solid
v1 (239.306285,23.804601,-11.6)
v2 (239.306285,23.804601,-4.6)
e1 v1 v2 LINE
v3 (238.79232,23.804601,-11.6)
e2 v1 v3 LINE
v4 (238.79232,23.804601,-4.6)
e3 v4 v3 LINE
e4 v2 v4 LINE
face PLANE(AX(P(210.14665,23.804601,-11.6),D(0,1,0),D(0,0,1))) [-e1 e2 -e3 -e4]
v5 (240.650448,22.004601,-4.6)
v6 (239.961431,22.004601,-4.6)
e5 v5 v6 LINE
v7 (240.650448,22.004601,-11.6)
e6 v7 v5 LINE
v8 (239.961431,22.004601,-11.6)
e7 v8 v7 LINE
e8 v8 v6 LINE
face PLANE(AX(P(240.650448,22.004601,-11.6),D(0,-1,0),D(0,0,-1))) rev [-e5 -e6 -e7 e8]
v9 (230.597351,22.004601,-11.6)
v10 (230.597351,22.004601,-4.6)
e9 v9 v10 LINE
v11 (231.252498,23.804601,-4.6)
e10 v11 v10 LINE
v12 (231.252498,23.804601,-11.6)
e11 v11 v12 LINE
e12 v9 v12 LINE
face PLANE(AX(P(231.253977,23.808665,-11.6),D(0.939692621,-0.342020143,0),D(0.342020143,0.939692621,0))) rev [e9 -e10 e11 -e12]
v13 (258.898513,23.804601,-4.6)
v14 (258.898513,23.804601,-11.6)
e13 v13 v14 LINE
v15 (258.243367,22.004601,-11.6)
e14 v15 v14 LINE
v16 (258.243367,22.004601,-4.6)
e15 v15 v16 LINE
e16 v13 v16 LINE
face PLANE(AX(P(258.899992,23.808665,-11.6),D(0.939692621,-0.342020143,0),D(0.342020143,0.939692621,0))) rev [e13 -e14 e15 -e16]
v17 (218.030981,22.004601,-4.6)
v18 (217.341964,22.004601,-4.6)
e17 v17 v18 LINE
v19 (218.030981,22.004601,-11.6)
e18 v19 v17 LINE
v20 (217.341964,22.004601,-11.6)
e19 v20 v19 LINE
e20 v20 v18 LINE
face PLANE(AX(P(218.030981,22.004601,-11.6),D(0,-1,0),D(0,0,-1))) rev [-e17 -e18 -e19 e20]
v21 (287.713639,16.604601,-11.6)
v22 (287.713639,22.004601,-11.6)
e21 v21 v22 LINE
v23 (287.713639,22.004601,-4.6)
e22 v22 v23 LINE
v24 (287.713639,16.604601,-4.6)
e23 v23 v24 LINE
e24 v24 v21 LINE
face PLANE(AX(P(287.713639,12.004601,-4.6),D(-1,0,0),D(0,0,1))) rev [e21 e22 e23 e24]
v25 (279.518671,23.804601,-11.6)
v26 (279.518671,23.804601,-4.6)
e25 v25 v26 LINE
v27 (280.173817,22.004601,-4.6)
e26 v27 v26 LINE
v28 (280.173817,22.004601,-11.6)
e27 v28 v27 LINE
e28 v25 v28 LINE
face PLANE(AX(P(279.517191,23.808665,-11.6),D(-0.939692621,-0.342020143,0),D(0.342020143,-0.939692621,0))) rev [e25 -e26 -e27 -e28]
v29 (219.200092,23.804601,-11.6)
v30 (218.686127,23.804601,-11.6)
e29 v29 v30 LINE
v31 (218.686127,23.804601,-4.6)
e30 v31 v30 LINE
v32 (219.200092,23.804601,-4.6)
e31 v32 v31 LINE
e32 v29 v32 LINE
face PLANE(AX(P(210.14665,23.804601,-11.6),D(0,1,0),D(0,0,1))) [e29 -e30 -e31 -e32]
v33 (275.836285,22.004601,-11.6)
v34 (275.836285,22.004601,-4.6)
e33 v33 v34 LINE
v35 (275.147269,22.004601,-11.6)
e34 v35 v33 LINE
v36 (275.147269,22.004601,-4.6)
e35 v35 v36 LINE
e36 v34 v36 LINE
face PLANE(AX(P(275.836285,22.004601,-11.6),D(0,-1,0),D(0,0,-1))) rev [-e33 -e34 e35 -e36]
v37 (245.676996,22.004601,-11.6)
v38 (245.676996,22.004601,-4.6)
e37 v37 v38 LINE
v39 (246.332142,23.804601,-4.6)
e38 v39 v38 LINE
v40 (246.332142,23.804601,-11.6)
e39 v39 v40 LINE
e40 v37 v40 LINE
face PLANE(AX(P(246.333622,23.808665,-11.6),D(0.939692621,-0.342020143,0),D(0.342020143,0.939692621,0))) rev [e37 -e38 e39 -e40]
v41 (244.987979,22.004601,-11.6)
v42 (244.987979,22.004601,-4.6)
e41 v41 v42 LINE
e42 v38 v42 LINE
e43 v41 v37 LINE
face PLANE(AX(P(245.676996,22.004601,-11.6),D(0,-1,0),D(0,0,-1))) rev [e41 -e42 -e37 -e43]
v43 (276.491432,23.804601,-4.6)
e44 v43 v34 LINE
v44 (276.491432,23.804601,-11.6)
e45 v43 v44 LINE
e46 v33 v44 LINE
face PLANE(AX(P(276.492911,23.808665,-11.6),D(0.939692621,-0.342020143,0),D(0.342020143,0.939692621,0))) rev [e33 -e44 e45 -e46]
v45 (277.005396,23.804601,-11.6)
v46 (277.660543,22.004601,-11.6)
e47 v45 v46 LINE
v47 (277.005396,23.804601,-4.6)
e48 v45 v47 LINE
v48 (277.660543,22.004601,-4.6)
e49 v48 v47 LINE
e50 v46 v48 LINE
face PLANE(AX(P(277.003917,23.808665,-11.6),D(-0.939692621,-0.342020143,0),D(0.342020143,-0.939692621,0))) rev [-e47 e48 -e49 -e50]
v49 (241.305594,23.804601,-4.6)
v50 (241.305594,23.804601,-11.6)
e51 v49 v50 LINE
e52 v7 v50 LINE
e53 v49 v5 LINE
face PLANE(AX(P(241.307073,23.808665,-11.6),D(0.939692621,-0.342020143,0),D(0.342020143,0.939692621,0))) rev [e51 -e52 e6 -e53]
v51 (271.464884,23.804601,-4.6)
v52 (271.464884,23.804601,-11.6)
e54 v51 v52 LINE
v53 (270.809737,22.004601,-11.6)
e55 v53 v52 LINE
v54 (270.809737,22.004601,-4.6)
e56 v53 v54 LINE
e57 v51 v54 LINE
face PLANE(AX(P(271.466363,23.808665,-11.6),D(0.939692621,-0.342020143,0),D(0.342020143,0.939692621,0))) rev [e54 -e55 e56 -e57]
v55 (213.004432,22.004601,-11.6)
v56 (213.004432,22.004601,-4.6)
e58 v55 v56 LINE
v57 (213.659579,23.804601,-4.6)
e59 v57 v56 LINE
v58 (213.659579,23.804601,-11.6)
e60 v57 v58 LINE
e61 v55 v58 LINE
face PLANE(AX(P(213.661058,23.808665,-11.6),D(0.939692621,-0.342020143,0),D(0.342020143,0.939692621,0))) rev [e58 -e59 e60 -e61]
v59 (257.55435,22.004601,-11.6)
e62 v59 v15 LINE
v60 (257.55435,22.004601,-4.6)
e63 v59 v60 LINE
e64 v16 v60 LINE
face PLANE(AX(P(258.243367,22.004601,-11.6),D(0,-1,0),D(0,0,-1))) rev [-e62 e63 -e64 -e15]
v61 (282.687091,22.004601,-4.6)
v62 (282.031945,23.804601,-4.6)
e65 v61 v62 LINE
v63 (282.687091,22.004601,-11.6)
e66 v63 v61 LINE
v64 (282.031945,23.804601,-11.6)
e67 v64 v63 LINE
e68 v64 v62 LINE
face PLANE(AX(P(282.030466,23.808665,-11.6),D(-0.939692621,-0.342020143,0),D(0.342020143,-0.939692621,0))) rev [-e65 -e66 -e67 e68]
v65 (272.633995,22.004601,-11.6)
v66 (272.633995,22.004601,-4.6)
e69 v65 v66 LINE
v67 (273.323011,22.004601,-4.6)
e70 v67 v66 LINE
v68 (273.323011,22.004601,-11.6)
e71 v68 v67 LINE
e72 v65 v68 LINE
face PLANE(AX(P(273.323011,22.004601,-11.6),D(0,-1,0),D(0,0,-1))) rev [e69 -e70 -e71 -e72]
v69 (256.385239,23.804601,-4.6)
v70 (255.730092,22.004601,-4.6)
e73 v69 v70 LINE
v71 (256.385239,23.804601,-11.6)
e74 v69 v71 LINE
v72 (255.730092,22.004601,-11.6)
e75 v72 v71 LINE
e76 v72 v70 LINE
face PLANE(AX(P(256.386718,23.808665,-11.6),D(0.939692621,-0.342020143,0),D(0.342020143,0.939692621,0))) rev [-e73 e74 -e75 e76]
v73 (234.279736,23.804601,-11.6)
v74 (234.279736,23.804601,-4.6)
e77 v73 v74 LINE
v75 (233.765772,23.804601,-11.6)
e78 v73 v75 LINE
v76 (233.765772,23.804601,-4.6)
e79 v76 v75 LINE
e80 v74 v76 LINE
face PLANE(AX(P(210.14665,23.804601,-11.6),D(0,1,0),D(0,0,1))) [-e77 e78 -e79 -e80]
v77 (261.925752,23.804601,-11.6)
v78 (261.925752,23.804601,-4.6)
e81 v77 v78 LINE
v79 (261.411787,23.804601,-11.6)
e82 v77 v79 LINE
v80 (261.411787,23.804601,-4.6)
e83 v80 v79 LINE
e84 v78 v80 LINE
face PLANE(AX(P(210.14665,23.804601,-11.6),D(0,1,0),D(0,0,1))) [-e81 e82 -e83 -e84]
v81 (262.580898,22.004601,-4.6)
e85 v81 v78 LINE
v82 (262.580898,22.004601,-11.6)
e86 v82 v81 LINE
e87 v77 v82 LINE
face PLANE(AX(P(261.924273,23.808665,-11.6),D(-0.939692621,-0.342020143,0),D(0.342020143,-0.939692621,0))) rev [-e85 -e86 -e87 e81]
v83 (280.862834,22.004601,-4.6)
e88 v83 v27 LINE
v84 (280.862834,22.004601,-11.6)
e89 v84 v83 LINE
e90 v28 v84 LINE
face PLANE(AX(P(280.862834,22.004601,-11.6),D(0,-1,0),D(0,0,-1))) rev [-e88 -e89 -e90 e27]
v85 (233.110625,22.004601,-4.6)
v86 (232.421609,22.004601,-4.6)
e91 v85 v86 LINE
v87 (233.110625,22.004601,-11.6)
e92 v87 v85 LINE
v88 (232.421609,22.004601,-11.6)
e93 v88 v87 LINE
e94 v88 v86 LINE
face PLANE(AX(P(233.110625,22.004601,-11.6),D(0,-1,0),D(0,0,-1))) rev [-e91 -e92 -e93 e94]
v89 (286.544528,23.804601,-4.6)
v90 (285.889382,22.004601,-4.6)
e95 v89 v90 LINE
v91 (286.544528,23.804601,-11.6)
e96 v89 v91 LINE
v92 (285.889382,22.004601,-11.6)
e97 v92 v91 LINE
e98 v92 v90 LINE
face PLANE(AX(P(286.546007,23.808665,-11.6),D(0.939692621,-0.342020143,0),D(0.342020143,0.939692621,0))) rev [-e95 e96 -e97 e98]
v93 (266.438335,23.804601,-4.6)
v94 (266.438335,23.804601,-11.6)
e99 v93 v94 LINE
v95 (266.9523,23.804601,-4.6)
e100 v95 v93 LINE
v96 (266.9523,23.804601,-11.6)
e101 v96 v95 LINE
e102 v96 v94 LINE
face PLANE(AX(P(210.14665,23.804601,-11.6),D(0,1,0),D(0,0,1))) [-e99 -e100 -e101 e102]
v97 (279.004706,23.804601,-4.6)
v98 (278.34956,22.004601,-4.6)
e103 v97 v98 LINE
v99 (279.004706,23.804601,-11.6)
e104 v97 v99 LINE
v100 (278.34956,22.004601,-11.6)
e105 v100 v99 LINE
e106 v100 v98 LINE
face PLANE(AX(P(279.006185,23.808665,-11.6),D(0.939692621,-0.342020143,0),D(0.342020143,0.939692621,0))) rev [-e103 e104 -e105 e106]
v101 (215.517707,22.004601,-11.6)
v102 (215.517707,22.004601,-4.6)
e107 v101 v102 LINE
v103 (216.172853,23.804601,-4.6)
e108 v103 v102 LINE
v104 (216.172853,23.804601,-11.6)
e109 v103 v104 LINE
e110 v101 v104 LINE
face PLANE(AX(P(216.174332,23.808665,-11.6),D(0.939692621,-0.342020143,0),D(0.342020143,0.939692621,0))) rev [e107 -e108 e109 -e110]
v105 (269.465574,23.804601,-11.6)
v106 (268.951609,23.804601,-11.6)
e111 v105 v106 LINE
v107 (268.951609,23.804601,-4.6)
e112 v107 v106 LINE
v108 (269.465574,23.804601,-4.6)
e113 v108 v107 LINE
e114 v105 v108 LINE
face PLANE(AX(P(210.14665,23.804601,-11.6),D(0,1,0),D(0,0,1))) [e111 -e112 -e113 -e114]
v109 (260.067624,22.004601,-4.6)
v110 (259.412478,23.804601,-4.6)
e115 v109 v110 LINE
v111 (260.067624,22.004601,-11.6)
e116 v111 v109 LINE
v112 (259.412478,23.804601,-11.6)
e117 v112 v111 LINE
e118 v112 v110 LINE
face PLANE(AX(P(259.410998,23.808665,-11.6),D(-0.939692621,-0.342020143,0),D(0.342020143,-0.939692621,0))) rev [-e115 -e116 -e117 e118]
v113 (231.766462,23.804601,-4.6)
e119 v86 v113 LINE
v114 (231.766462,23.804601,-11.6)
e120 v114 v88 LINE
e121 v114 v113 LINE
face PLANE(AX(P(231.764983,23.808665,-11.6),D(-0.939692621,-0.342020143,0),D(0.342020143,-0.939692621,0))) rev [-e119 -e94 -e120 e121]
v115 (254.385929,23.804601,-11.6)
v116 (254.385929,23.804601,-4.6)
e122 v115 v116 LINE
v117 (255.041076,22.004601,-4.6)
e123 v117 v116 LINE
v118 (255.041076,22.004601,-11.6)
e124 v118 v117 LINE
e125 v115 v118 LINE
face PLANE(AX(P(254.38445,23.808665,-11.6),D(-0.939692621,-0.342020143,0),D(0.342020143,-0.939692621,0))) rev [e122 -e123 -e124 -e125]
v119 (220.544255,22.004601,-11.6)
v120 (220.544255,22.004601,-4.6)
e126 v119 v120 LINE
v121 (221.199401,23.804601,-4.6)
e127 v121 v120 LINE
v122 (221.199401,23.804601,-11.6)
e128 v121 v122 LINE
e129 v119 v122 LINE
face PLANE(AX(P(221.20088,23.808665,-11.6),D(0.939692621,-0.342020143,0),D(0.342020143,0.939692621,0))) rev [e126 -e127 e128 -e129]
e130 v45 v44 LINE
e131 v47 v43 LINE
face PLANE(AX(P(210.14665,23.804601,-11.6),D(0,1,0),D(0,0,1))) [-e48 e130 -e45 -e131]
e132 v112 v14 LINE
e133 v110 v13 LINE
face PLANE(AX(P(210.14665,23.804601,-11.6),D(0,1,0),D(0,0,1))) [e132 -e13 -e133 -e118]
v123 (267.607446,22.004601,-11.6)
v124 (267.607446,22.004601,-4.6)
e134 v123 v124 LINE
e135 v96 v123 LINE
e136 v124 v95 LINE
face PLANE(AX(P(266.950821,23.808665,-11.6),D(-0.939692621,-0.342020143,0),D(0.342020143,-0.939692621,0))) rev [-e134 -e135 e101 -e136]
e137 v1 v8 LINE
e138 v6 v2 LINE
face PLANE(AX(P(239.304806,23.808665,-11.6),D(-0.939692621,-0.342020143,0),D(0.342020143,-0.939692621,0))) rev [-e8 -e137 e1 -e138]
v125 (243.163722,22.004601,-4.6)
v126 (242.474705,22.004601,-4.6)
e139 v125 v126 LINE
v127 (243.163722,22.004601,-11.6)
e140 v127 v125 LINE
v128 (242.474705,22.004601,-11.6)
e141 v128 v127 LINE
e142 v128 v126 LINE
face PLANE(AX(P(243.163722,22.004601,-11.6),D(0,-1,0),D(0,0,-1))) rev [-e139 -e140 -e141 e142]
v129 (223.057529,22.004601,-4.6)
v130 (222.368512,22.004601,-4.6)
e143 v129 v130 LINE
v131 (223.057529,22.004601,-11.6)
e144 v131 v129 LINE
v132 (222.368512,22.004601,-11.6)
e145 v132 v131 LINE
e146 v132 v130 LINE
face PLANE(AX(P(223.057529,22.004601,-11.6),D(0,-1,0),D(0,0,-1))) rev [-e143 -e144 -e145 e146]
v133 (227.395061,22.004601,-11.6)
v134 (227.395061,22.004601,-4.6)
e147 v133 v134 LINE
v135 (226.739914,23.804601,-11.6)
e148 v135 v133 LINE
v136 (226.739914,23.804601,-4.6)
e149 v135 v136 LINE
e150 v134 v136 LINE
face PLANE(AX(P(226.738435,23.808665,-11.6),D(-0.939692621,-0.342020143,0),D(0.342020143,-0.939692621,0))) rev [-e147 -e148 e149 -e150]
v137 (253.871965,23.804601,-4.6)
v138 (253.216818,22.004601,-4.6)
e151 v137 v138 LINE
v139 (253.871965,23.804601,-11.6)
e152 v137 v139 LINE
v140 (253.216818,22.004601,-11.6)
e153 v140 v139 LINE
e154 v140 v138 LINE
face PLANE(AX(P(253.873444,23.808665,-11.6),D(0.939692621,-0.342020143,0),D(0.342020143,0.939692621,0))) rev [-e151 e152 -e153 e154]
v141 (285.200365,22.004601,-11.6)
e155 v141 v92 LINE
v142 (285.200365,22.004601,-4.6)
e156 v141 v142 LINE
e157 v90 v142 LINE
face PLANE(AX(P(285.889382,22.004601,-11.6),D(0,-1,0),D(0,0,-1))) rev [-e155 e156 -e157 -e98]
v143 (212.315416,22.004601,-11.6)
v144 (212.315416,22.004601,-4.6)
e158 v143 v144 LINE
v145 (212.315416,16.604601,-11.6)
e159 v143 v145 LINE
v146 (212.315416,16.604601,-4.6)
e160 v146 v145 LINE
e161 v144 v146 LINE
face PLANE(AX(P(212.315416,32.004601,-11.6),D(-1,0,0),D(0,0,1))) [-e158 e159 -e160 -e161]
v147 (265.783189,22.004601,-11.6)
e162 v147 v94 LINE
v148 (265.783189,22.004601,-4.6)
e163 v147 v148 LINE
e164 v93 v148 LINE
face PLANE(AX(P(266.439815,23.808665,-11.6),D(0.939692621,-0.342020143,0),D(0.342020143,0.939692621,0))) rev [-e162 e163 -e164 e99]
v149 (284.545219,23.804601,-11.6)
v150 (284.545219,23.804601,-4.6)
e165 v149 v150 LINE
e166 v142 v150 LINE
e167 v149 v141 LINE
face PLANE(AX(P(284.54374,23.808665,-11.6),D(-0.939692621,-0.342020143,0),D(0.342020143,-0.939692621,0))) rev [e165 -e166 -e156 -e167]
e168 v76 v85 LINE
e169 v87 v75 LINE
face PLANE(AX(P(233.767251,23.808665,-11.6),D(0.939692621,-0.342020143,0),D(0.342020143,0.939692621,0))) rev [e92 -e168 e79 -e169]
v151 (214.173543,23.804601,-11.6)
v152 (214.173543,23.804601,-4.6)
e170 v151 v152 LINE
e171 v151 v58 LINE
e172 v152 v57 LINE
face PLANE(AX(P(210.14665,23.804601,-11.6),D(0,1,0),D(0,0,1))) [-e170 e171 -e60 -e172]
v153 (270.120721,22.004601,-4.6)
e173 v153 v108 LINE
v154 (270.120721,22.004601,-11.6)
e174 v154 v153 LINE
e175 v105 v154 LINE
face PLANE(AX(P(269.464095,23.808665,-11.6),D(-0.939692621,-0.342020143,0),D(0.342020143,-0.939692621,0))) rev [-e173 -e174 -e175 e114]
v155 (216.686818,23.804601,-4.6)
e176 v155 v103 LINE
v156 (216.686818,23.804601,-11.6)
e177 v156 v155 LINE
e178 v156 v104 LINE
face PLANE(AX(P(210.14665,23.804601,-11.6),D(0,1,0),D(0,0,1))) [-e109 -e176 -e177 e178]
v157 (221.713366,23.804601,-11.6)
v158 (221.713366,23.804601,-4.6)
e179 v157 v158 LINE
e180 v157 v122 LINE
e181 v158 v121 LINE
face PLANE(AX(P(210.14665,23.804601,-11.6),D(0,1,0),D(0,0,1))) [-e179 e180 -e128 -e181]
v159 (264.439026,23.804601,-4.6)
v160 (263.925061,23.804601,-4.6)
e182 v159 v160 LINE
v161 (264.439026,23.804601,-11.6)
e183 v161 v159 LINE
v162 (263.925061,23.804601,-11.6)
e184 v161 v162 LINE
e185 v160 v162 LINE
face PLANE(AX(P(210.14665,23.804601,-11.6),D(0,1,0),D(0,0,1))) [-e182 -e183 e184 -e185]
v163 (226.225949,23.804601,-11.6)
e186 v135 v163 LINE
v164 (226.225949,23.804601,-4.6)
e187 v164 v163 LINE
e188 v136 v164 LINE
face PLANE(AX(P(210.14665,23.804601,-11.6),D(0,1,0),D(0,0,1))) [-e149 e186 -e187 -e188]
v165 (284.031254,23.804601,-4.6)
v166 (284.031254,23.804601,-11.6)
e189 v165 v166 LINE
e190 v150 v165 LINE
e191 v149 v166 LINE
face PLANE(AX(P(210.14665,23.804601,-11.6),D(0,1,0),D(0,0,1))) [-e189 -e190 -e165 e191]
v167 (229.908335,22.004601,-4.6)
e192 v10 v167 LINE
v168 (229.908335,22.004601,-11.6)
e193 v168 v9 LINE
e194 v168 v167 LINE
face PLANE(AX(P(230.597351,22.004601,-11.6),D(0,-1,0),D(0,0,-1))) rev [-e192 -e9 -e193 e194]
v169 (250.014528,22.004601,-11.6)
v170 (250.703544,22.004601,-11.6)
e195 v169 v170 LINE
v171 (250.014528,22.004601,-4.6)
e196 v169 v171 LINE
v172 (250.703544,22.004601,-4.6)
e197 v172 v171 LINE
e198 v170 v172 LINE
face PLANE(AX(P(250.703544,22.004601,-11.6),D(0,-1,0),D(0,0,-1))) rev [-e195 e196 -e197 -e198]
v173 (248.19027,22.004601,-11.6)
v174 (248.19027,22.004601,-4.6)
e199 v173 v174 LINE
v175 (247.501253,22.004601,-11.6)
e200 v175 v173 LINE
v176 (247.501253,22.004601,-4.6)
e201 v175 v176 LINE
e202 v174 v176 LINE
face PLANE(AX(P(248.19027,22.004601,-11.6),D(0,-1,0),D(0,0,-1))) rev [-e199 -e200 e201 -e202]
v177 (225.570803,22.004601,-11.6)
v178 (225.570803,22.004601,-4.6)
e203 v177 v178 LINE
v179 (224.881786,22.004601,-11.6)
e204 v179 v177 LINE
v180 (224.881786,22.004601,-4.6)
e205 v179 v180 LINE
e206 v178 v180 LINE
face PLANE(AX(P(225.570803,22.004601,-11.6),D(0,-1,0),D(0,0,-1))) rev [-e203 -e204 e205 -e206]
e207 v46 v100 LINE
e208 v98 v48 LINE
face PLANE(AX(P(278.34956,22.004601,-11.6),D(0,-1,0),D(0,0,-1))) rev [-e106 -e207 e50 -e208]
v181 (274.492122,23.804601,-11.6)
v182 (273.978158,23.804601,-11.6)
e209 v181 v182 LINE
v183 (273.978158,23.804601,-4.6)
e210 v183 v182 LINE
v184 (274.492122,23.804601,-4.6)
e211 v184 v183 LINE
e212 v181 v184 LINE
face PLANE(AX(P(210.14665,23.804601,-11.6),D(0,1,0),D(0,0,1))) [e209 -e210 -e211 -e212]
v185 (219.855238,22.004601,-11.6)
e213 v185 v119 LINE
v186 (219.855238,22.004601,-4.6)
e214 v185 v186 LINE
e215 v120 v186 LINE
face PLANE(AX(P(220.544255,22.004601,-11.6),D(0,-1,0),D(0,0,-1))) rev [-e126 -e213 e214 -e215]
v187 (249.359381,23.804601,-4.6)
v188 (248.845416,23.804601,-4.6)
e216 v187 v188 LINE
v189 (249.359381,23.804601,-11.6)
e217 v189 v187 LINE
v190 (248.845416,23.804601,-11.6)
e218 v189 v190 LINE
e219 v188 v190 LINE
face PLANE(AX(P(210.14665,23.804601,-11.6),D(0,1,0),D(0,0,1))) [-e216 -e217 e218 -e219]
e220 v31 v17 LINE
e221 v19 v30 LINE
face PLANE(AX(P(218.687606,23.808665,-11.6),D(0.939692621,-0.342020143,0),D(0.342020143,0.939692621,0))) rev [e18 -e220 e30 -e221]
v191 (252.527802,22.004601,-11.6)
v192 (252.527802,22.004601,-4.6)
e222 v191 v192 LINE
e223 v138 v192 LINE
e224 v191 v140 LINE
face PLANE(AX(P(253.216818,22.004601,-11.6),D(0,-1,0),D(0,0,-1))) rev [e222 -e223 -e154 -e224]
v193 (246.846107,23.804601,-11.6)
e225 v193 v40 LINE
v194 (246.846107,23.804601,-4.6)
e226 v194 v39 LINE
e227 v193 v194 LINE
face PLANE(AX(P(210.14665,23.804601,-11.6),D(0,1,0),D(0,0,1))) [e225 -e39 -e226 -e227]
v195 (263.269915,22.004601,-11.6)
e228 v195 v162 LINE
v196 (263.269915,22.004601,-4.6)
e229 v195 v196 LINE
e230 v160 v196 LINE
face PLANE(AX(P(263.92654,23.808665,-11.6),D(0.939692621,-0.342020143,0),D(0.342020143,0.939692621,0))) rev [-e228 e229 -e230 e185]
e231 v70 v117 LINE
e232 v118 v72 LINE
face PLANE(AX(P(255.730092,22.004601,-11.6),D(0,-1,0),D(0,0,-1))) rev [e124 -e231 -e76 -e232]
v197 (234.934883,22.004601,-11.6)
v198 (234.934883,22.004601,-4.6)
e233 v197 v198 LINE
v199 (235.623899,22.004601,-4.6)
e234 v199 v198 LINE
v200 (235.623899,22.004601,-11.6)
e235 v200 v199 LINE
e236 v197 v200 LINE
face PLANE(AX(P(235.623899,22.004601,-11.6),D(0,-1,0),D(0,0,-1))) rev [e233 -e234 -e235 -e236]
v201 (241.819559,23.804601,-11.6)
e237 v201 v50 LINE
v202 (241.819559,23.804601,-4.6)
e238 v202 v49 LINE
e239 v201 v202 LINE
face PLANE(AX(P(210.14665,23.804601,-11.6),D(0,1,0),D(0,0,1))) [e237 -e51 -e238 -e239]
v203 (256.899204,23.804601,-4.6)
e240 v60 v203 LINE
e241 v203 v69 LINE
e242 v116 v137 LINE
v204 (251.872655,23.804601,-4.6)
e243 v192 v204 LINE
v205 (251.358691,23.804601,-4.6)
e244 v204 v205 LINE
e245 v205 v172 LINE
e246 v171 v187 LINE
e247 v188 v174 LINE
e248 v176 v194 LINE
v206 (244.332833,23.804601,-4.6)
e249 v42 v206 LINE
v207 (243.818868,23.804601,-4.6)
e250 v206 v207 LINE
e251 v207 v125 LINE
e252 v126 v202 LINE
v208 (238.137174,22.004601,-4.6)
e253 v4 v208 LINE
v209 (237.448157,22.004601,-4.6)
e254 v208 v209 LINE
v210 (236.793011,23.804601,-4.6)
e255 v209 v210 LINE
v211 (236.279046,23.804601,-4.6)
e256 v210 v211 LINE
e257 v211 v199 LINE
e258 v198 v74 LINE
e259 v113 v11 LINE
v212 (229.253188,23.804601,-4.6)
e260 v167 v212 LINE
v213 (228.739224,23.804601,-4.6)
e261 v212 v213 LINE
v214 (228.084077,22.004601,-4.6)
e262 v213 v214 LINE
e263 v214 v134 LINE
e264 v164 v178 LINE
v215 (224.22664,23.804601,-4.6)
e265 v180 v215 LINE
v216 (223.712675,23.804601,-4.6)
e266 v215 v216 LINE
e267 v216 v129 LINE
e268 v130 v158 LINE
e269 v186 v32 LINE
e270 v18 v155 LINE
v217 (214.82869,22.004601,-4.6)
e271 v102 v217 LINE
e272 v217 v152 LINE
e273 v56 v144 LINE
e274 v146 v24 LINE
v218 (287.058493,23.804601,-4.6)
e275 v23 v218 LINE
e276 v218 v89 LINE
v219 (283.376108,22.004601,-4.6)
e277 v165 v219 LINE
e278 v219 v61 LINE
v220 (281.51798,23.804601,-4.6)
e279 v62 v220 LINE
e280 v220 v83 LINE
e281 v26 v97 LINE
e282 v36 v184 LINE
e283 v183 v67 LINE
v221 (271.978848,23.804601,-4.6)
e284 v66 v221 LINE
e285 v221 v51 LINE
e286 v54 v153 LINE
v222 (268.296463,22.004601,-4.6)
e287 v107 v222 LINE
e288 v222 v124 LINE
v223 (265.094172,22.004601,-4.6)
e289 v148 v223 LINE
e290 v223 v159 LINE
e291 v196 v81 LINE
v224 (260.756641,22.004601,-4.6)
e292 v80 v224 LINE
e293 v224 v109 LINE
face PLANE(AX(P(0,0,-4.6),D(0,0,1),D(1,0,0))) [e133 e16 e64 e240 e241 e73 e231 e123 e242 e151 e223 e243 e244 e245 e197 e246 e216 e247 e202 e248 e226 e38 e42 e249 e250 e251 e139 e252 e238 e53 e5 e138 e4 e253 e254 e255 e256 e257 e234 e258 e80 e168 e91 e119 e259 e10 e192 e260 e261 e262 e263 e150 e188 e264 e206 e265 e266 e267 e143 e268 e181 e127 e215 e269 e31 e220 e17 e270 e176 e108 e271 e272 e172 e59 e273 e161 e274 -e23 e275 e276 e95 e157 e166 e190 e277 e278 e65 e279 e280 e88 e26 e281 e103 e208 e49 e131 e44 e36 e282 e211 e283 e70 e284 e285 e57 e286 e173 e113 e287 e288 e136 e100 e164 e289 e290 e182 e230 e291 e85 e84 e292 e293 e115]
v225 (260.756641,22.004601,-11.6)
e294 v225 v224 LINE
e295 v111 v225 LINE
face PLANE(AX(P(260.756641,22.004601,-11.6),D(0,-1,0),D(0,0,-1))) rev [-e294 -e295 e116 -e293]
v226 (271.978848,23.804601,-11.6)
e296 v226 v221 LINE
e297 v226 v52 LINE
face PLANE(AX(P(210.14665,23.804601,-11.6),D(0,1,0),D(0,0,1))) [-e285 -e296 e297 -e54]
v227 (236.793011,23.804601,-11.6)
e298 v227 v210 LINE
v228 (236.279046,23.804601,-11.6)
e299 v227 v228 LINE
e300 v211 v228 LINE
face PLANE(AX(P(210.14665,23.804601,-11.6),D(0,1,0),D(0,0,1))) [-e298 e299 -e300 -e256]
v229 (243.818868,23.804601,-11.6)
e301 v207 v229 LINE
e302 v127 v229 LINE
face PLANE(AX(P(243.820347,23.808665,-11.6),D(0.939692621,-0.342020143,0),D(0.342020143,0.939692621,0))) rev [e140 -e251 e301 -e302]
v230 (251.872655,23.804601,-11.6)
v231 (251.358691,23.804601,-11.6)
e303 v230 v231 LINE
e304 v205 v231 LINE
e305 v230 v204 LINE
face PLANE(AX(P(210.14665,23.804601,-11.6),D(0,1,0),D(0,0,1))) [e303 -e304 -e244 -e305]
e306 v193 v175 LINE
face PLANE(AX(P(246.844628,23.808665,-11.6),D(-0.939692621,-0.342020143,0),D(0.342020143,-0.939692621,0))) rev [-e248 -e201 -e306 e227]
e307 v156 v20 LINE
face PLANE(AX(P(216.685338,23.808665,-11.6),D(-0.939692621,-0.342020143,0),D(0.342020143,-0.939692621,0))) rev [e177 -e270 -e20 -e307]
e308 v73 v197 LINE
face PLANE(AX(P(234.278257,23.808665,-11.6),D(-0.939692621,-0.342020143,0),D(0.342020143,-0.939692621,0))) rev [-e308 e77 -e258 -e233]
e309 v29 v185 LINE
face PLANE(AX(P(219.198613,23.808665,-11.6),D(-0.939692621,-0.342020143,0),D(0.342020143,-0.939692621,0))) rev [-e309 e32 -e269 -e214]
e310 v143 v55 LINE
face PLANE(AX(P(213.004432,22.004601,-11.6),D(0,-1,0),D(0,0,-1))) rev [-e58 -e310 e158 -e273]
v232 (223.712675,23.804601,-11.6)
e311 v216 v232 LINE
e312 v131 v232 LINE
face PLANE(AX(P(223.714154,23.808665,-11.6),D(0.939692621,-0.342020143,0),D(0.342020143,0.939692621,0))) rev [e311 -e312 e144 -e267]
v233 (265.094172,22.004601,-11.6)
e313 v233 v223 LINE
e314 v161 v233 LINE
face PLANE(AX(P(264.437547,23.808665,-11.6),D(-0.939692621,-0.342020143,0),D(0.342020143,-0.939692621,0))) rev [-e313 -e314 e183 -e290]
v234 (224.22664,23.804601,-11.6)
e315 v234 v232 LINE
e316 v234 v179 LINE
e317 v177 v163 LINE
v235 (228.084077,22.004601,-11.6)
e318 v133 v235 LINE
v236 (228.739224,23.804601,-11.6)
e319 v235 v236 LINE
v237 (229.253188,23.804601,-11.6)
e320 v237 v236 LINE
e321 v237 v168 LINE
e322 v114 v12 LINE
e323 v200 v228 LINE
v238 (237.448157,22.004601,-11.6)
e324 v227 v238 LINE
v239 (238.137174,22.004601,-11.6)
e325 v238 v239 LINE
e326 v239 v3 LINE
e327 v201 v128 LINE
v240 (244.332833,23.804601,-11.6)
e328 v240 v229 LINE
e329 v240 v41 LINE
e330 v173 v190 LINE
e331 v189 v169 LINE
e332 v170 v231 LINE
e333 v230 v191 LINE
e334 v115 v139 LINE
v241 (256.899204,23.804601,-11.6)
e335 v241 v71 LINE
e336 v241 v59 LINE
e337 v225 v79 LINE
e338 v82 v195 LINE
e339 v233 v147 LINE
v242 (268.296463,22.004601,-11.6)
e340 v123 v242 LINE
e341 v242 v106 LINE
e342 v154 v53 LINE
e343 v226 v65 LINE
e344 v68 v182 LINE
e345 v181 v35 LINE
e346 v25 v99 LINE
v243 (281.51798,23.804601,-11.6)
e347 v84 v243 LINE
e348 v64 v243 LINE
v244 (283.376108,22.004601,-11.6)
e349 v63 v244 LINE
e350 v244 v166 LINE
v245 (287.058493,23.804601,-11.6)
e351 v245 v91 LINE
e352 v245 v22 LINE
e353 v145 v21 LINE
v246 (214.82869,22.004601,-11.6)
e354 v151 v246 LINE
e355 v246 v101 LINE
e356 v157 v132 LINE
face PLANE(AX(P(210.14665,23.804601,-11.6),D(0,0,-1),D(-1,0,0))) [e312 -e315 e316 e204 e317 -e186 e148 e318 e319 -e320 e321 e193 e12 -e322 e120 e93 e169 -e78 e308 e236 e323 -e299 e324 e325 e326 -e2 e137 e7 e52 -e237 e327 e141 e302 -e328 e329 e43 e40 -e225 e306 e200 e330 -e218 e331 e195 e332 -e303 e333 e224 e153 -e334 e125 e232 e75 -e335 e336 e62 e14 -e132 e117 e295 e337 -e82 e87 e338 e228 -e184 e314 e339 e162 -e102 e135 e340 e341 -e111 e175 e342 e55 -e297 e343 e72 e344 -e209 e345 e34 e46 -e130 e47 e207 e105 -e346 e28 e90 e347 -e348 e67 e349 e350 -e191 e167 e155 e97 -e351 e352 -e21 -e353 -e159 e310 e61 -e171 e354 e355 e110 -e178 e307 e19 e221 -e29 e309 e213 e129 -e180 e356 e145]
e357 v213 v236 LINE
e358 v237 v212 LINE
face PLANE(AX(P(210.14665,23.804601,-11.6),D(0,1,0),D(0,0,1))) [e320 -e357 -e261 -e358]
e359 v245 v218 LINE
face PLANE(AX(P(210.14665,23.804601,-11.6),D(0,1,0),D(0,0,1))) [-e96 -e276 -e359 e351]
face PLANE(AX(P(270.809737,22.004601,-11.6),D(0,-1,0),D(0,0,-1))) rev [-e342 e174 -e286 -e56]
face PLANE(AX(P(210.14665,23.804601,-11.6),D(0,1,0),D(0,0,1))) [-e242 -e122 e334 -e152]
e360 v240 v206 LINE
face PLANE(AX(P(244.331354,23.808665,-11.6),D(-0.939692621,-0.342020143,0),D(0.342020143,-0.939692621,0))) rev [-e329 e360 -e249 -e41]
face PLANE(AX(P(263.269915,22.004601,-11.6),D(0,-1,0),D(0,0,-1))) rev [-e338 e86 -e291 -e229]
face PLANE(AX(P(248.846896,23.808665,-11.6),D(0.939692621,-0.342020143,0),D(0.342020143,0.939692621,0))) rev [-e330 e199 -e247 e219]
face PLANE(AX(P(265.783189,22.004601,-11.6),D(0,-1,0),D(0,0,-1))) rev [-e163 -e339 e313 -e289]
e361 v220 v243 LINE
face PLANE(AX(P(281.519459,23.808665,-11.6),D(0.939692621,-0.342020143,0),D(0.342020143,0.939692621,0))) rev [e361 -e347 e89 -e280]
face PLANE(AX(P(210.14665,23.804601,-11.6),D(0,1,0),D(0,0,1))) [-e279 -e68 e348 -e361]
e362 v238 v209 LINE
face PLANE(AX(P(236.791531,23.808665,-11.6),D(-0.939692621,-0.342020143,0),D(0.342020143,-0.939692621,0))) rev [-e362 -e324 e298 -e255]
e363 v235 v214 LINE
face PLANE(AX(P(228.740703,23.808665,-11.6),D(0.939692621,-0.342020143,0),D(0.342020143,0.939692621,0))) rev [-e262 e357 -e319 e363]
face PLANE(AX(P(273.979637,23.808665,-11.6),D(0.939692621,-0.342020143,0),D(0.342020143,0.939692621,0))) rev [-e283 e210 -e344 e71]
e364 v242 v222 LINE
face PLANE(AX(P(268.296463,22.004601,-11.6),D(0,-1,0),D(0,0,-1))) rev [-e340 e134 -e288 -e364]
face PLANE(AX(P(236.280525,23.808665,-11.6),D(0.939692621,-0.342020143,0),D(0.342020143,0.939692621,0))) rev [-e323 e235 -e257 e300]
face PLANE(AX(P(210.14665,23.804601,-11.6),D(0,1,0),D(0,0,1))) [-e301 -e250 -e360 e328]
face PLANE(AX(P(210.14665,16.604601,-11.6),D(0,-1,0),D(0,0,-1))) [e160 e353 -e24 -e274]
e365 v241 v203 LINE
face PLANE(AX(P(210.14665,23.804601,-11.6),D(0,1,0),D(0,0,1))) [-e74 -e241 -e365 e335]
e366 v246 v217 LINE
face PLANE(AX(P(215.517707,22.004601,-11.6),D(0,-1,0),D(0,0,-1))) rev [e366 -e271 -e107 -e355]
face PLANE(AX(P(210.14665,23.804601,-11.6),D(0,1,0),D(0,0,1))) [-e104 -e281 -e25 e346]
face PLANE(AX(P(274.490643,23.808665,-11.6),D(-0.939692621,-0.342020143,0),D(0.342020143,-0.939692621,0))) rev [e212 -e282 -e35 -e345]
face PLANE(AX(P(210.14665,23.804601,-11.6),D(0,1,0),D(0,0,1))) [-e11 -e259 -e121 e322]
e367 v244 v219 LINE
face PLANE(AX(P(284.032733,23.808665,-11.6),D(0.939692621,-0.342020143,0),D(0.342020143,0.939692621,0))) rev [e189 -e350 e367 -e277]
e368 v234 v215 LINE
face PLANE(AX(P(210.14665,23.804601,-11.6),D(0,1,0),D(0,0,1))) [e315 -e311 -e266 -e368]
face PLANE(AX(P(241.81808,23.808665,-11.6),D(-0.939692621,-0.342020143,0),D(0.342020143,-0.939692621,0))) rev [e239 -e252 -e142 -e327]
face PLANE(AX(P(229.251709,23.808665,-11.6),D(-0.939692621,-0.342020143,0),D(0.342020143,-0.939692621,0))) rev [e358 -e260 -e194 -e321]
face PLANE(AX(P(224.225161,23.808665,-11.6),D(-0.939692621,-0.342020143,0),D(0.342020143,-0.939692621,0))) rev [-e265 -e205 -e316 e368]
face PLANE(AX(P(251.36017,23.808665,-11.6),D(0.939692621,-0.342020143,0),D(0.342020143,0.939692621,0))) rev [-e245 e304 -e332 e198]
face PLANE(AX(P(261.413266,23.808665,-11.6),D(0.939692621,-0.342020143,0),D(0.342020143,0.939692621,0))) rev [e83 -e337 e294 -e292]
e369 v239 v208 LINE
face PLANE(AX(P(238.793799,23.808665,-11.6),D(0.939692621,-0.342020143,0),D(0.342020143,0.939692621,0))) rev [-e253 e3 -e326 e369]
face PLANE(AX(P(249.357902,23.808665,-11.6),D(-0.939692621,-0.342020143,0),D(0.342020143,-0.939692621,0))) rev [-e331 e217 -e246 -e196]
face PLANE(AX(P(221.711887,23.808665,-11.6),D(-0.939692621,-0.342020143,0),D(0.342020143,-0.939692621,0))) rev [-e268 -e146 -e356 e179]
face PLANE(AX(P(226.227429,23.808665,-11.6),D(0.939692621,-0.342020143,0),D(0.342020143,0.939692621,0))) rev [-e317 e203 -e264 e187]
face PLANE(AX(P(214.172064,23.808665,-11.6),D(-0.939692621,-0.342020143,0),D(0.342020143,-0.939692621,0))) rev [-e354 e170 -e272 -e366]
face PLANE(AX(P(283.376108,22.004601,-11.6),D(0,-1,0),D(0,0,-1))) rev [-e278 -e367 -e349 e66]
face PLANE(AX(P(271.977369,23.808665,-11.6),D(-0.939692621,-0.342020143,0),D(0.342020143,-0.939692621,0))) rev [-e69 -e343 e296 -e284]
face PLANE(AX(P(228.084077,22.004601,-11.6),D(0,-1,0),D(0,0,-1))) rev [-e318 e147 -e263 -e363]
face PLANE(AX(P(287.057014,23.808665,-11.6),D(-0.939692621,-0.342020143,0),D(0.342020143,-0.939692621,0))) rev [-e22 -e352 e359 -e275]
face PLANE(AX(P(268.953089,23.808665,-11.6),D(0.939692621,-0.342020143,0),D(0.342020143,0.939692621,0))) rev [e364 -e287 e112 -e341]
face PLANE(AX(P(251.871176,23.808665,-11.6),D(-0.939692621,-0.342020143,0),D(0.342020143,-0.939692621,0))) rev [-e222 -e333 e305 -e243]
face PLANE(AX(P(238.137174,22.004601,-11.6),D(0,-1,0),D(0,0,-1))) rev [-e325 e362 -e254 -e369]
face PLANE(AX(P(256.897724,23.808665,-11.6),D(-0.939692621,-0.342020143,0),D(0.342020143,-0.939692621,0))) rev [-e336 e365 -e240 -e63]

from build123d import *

# Parameters (mm, degrees)
BLANKSKE_W                   = 500
BLANKSKE_H                   = 45
BLANK_DEPTH                  = 20
TOOTHCUTSIM_DEPTH            = 503.419147724
TEETHCUTS_COUNT              = 33
TEETHCUTS_PITCH              = 15.70796325
SCALA1_SCALE                 = 0.16
ESTRUSIONE_ESTRUSIONE1_DEPTH = 3.8
TAGLIO_ESTRUSIONE2_DEPTH     = 10
TAGLIO_ESTRUSIONE3_DEPTH     = 10


with BuildPart() as part:
    # BlankSke → Blank (new body)
    with BuildSketch(Plane.XY):
        with Locations((250, 22.5)):
            Rectangle(BLANKSKE_W, BLANKSKE_H)
    extrude(amount=-BLANK_DEPTH)

    # TooCutSkeSim → ToothCutSim (cut, through all)
    with BuildSketch(Plane.XY):
        Polygon((2.153176848, 33.75), (-2.153176848, 33.75), (-6.257086828, 45.0254), (6.257086828, 45.0254), align=None)
    toothcutsim = extrude(amount=-TOOTHCUTSIM_DEPTH, mode=Mode.SUBTRACT)

    # TeethCuts: ToothCutSim ×33
    with Locations(*[(i * TEETHCUTS_PITCH, 0, 0) for i in range(1, TEETHCUTS_COUNT)]):
        add(toothcutsim, mode=Mode.SUBTRACT)


with BuildPart() as part_1:
    # Scala1: scaled about (250.174583298, 19.767382057, -10)
    add(part.part.scale(SCALA1_SCALE).moved(Location((210.14664997, 16.604600928, -8.4))))

    # Schizzo1 → Estrusione-Estrusione1 (add)
    with BuildSketch(Plane.XY.offset(-8.4)):
        Polygon((290.14664997, 16.604600928), (290.14664997, 22.225123203), (289.571767093, 23.804600928), (289.057802407, 23.804600928), (288.402655986, 22.004600928), (287.713639394, 22.004600928), (287.058492973, 23.804600928), (286.544528287, 23.804600928), (285.889381866, 22.004600928), (285.200365274, 22.004600928), (284.545218853, 23.804600928), (284.031254167, 23.804600928), (283.376107746, 22.004600928), (282.687091154, 22.004600928), (282.031944733, 23.804600928), (281.517980047, 23.804600928), (280.862833626, 22.004600928), (280.173817034, 22.004600928), (279.518670613, 23.804600928), (279.004705927, 23.804600928), (278.349559506, 22.004600928), (277.660542914, 22.004600928), (277.005396493, 23.804600928), (276.491431807, 23.804600928), (275.836285386, 22.004600928), (275.147268794, 22.004600928), (274.492122373, 23.804600928), (273.978157687, 23.804600928), (273.323011266, 22.004600928), (272.633994674, 22.004600928), (271.978848253, 23.804600928), (271.464883567, 23.804600928), (270.809737146, 22.004600928), (270.120720554, 22.004600928), (269.465574133, 23.804600928), (268.951609447, 23.804600928), (268.296463026, 22.004600928), (267.607446434, 22.004600928), (266.952300013, 23.804600928), (266.438335327, 23.804600928), (265.783188906, 22.004600928), (265.094172314, 22.004600928), (264.439025893, 23.804600928), (263.925061207, 23.804600928), (263.269914786, 22.004600928), (262.580898194, 22.004600928), (261.925751773, 23.804600928), (261.411787087, 23.804600928), (260.756640666, 22.004600928), (260.067624074, 22.004600928), (259.412477653, 23.804600928), (258.898512967, 23.804600928), (258.243366546, 22.004600928), (257.554349954, 22.004600928), (256.899203533, 23.804600928), (256.385238847, 23.804600928), (255.730092426, 22.004600928), (255.041075834, 22.004600928), (254.385929413, 23.804600928), (253.871964727, 23.804600928), (253.216818306, 22.004600928), (252.527801714, 22.004600928), (251.872655293, 23.804600928), (251.358690607, 23.804600928), (250.703544186, 22.004600928), (250.014527594, 22.004600928), (249.359381173, 23.804600928), (248.845416487, 23.804600928), (248.190270066, 22.004600928), (247.501253474, 22.004600928), (246.846107053, 23.804600928), (246.332142367, 23.804600928), (245.676995946, 22.004600928), (244.987979354, 22.004600928), (244.332832933, 23.804600928), (243.818868247, 23.804600928), (243.163721826, 22.004600928), (242.474705234, 22.004600928), (241.819558813, 23.804600928), (241.305594127, 23.804600928), (240.650447706, 22.004600928), (239.961431114, 22.004600928), (239.306284693, 23.804600928), (238.792320007, 23.804600928), (238.137173586, 22.004600928), (237.448156994, 22.004600928), (236.793010573, 23.804600928), (236.279045887, 23.804600928), (235.623899466, 22.004600928), (234.934882874, 22.004600928), (234.279736453, 23.804600928), (233.765771767, 23.804600928), (233.110625346, 22.004600928), (232.421608754, 22.004600928), (231.766462333, 23.804600928), (231.252497647, 23.804600928), (230.597351226, 22.004600928), (229.908334634, 22.004600928), (229.253188213, 23.804600928), (228.739223527, 23.804600928), (228.084077106, 22.004600928), (227.395060514, 22.004600928), (226.739914093, 23.804600928), (226.225949407, 23.804600928), (225.570802986, 22.004600928), (224.881786394, 22.004600928), (224.226639973, 23.804600928), (223.712675287, 23.804600928), (223.057528866, 22.004600928), (222.368512274, 22.004600928), (221.713365853, 23.804600928), (221.199401167, 23.804600928), (220.544254746, 22.004600928), (219.855238154, 22.004600928), (219.200091733, 23.804600928), (218.686127047, 23.804600928), (218.030980626, 22.004600928), (217.341964034, 22.004600928), (216.686817613, 23.804600928), (216.172852927, 23.804600928), (215.517706506, 22.004600928), (214.828689914, 22.004600928), (214.173543493, 23.804600928), (213.659578807, 23.804600928), (213.004432386, 22.004600928), (212.315415794, 22.004600928), (211.660269373, 23.804600928), (211.146304687, 23.804600928), (210.491158266, 22.004600928), (210.14664997, 22.004600928), (210.14664997, 16.604600928), align=None)
    extrude(amount=ESTRUSIONE_ESTRUSIONE1_DEPTH)

    # Schizzo2 → Taglio-Estrusione2 (cut, symmetric)
    with BuildSketch(Plane(origin=(0, 22.004600928, 0), x_dir=(1, 0, 0), z_dir=(0, 1, 0))):
        Polygon((212.315415794, 11.6), (212.315415794, 4.6), (208.462167245, 2.347877262), (205.897247637, 4.6), (205.110337821, 10.211571909), (209.734386357, 15.720465951), (212.233893697, 13.52577833), align=None)
    extrude(amount=TAGLIO_ESTRUSIONE2_DEPTH, both=True, mode=Mode.SUBTRACT)

    # Schizzo3 → Taglio-Estrusione3 (cut, symmetric)
    with BuildSketch(Plane(origin=(0, 22.004600928, 0), x_dir=(1, 0, 0), z_dir=(0, 1, 0))):
        Polygon((287.713639394, 4.6), (287.713639394, 11.6), (292.791663961, 17.742043918), (298.093315887, 11.169927051), (295.206395546, 3.598494096), (291.083357716, 1.033572149), (287.713639394, 3.819536015), align=None)
    extrude(amount=TAGLIO_ESTRUSIONE3_DEPTH, both=True, mode=Mode.SUBTRACT)


solid = part_1.part
